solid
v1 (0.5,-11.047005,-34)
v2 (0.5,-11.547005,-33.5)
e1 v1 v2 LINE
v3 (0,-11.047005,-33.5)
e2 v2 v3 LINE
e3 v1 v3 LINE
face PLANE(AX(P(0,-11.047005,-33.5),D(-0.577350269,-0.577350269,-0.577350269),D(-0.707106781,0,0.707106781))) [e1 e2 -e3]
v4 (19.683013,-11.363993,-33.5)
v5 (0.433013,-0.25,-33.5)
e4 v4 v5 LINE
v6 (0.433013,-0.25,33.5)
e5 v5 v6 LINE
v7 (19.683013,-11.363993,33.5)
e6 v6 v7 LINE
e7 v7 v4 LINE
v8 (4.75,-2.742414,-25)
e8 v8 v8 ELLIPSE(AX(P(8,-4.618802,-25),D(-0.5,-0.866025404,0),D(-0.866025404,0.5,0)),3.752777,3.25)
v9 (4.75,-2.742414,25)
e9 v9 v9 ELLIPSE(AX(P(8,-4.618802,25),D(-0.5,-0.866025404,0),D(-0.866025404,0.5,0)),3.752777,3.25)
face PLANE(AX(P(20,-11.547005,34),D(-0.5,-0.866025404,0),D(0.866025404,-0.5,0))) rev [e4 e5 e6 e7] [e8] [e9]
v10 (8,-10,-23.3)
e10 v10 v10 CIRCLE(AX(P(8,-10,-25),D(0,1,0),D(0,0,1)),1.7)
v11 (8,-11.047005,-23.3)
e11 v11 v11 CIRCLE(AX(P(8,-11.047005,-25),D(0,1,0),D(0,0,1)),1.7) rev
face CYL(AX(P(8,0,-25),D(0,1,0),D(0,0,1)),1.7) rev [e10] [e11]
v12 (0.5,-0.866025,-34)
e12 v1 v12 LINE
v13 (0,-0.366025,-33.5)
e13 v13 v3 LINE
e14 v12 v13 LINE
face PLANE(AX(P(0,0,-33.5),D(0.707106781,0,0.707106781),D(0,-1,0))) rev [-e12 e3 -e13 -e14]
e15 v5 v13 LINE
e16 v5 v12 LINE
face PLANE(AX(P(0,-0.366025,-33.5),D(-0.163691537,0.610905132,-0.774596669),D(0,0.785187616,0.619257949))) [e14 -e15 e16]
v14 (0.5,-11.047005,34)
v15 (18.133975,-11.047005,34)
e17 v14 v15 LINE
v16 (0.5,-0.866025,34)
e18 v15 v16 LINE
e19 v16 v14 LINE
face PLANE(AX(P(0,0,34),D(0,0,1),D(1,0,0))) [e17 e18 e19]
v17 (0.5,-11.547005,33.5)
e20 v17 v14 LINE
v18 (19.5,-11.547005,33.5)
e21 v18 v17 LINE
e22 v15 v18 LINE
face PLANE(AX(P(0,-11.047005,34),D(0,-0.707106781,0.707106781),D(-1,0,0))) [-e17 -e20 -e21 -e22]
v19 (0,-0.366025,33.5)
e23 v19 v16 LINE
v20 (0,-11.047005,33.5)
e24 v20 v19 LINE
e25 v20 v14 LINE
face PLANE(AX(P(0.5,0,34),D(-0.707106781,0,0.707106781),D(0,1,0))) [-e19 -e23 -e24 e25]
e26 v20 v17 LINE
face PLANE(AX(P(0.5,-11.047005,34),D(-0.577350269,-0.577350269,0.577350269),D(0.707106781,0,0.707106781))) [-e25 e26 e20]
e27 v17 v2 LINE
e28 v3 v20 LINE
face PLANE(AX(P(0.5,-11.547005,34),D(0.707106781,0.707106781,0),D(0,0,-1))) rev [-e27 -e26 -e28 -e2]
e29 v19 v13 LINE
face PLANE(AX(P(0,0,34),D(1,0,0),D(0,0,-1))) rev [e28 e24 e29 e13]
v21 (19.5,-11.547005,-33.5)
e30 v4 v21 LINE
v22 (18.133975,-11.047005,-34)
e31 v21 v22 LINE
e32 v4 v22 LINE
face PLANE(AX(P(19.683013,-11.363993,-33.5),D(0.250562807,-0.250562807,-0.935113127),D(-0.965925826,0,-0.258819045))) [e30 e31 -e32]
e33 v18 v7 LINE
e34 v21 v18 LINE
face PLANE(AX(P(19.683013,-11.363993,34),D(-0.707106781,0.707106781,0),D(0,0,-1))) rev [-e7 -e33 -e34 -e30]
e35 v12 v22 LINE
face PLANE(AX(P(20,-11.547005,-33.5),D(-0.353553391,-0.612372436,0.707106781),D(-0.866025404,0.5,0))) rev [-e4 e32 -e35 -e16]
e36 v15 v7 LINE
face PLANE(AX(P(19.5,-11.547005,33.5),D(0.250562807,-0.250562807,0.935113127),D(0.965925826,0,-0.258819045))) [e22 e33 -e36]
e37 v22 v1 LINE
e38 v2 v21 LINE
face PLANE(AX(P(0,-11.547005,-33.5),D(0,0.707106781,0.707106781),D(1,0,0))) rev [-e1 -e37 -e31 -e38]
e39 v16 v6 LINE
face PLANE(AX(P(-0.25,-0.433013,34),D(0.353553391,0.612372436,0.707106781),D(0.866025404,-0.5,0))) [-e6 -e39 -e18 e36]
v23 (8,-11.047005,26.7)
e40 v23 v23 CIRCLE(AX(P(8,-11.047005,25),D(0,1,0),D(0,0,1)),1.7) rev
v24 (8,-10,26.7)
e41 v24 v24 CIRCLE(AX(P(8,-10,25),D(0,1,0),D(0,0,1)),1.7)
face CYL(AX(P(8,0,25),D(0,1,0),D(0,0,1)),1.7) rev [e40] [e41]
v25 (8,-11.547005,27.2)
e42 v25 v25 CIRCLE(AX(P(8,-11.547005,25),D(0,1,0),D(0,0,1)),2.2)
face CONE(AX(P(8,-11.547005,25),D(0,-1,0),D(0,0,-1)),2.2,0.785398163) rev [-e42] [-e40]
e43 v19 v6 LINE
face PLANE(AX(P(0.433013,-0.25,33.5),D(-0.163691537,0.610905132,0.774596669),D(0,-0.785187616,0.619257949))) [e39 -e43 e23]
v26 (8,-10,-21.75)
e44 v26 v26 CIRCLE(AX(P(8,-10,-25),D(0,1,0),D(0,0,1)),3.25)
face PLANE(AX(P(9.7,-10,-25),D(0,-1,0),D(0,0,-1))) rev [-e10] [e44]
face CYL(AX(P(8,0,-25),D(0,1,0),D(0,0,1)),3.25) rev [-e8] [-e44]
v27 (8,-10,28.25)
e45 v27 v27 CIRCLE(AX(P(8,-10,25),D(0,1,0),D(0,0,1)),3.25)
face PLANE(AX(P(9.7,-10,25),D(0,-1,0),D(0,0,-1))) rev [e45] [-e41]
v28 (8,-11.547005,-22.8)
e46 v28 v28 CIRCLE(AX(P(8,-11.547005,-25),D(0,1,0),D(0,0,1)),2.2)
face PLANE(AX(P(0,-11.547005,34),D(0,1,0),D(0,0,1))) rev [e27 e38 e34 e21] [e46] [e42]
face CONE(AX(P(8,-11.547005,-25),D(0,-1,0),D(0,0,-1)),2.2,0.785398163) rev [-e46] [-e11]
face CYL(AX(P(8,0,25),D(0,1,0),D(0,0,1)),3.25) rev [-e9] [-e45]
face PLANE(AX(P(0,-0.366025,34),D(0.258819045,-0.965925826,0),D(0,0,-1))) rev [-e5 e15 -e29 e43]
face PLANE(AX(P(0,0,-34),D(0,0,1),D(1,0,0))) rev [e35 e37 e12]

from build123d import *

# Parameters (mm, degrees)
BOSS_EXTRUDE1_DEPTH                                 = 34
CBORE_FOR_M3_HEX_SOCKET_HEAD_CAP_SCREW1_D           = 3.4
CBORE_FOR_M3_HEX_SOCKET_HEAD_CAP_SCREW1_CBORE_D     = 6.5
CBORE_FOR_M3_HEX_SOCKET_HEAD_CAP_SCREW1_CBORE_DEPTH = 10


with BuildPart() as part:
    # Sketch1 → Boss-Extrude1 (new, symmetric)
    with BuildSketch(Plane.XY):
        Polygon((0, 0), (0, -11.547005384), (20, -11.547005384), align=None)
    extrude(amount=BOSS_EXTRUDE1_DEPTH, both=True)

    # CBORE for M3 Hex Socket Head Cap Screw1 (through all)
    with Locations(Plane(origin=(0, 0, 0), x_dir=(1, 0, 0), z_dir=(0, 1, 0))):
        with Locations((8, -25), (8, 25)):
            CounterBoreHole(CBORE_FOR_M3_HEX_SOCKET_HEAD_CAP_SCREW1_D / 2, CBORE_FOR_M3_HEX_SOCKET_HEAD_CAP_SCREW1_CBORE_D / 2, CBORE_FOR_M3_HEX_SOCKET_HEAD_CAP_SCREW1_CBORE_DEPTH)

    # Chamfer1
    # the kernel refuses this chamfer: 0.5, 0.366025404 mm, written as the material it takes off along each edge
    with BuildSketch(Plane(origin=(0.333333333, -11.21367205, 33.666666667), x_dir=(0.7071067811865475, -0.7071067811865476, 0), z_dir=(-0.5773502691896258, -0.5773502691896257, 0.5773502691896256)), Plane(origin=(0.333333333, -11.21367205, -33.666666667), x_dir=(0.7071067811865474, 0, -0.7071067811865476), z_dir=(-0.5773502691896258, -0.5773502691896257, -0.5773502691896257))) as chamfer1_piece_1:
        Polygon((-0.353553391, -0.204124145), (0.353553391, -0.204124145), (0, 0.40824829), align=None)
    extrude(amount=0.635085296, mode=Mode.SUBTRACT)
    with BuildSketch(Plane(origin=(19.105662433, -11.319334483, 33.666666667), x_dir=(-0.8880738339771186, 0.3250575836718637, 0.3250575836718637), z_dir=(0.25056280708572953, -0.2505628070857271, 0.9351131265310311))) as chamfer1_piece_2:
        Polygon((-0.478383292, 0.07914139), (1.059805709, 0.07914139), (-0.581422417, -0.15828278), align=None)
    extrude(amount=0.652121763, mode=Mode.SUBTRACT)
    with BuildSketch(Plane(origin=(19.105662433, -11.319334483, -33.666666667), x_dir=(0.8880738339771186, -0.3250575836718637, 0.3250575836718637), z_dir=(0.25056280708572953, -0.2505628070857271, -0.9351131265310311))) as chamfer1_piece_3:
        Polygon((-1.059805709, 0.07914139), (0.478383292, 0.07914139), (0.581422417, -0.15828278), align=None)
    extrude(amount=0.652121763, mode=Mode.SUBTRACT)
    with BuildSketch(Plane(origin=(0.311004234, -0.494016936, -33.666666667), x_dir=(0.5773502691896288, -0.5773502691896194, -0.5773502691896291), z_dir=(-0.16369153687076843, 0.6109051323707225, -0.7745966692414806))) as chamfer1_piece_4:
        Polygon((-0.349679369, 0.136409614), (0.516346035, 0.136409614), (-0.166666667, -0.272819228), align=None)
    extrude(amount=0.671995646, mode=Mode.SUBTRACT)
    with BuildSketch(Plane(origin=(0.311004234, -0.494016936, 33.666666667), x_dir=(0.5773502691896286, -0.5773502691896196, 0.5773502691896291), z_dir=(-0.1636915368707684, 0.6109051323707224, 0.7745966692414807))) as chamfer1_piece_5:
        Polygon((-0.349679369, -0.136409614), (0.516346035, -0.136409614), (-0.166666667, 0.272819228), align=None)
    extrude(amount=0.671995646, mode=Mode.SUBTRACT)
    with BuildSketch(Plane(origin=(-1.285841494, -11.547005384, 34), x_dir=(0, -0.02749587661058574, -0.9996219169112968), z_dir=(1, 0, 0)), Plane(origin=(-1.285841494, -11.547005384, -34), x_dir=(0, 0.999621916911297, -0.0274958766105822), z_dir=(1, 0, 0))) as chamfer1_piece_6:
        with BuildLine():
            Line((0.514336598, 0), (-0.028273577, 0.513558897))
            Line((-0.028273577, 0.513558897), (-0.038269797, 0.513283938))
            ThreePointArc((-0.038269797, 0.513283938), (-0.017064614, 0.256698915), (-0.009996219, -0.000274959))
            Line((-0.009996219, -0.000274959), (0.000274959, -0.009996219))
            ThreePointArc((0.000274959, -0.009996219), (0.257248832, -0.002927825), (0.514611556, -0.009996219))
            Line((0.514611556, -0.009996219), (0.514336598, 0))
        make_face()
    extrude(amount=22.571682988, mode=Mode.SUBTRACT)
    with BuildSketch(Plane(origin=(8, -11.547005384, -25), x_dir=(-1, 0, 0), z_dir=(0, 0, 1))) as chamfer1_piece_7:
        with BuildLine():
            Line((2.214142136, 0.014142136), (1.685857864, -0.514142136))
            Line((1.685857864, -0.514142136), (1.675857864, -0.514142136))
            ThreePointArc((1.675857864, -0.514142136), (1.69, -0.257071068), (1.69, 0))
            Line((1.69, 0), (1.7, 0.01))
            ThreePointArc((1.7, 0.01), (1.957071068, 0.01), (2.214142136, 0.024142136))
            Line((2.214142136, 0.024142136), (2.214142136, 0.014142136))
        make_face()
    revolve(axis=Axis((8, -11.547005384, -25), (0, -1, 0)), mode=Mode.SUBTRACT)
    with BuildSketch(Plane(origin=(8, -11.547005384, 25), x_dir=(-1, 0, 0), z_dir=(0, 0, 1))) as chamfer1_piece_8:
        with BuildLine():
            Line((2.214142136, 0.014142136), (1.685857864, -0.514142136))
            Line((1.685857864, -0.514142136), (1.675857864, -0.514142136))
            ThreePointArc((1.675857864, -0.514142136), (1.69, -0.257071068), (1.69, 0))
            Line((1.69, 0), (1.7, 0.01))
            ThreePointArc((1.7, 0.01), (1.957071068, 0.01), (2.214142136, 0.024142136))
            Line((2.214142136, 0.024142136), (2.214142136, 0.014142136))
        make_face()
    revolve(axis=Axis((8, -11.547005384, 25), (0, -1, 0)), mode=Mode.SUBTRACT)
    with BuildSketch(Plane(origin=(0, 1.285841494, -34), x_dir=(-0.027495876610586483, 0, 0.9996219169112968), z_dir=(0, -1, 0))) as chamfer1_piece_9:
        with BuildLine():
            Line((0.514336598, 0), (-0.028273577, -0.513558897))
            Line((-0.028273577, -0.513558897), (-0.038269797, -0.513283938))
            ThreePointArc((-0.038269797, -0.513283938), (-0.017064614, -0.256698915), (-0.009996219, 0.000274959))
            Line((-0.009996219, 0.000274959), (0.000274959, 0.009996219))
            ThreePointArc((0.000274959, 0.009996219), (0.257248832, 0.002927825), (0.514611556, 0.009996219))
            Line((0.514611556, 0.009996219), (0.514336598, 0))
        make_face()
    extrude(amount=14.118688372, mode=Mode.SUBTRACT)
    with BuildSketch(Plane(origin=(21.113571399, -12.189926131, -34), x_dir=(-0.4998109584556428, -0.8656979742248838, -0.027495876610582233), z_dir=(-0.8660254037844419, 0.4999999999999943, 0))) as chamfer1_piece_10:
        with BuildLine():
            Line((0.514336598, 0), (-0.028273577, 0.513558897))
            Line((-0.028273577, 0.513558897), (-0.038269797, 0.513283938))
            ThreePointArc((-0.038269797, 0.513283938), (-0.017064614, 0.256698915), (-0.009996219, -0.000274959))
            Line((-0.009996219, -0.000274959), (0.000274959, -0.009996219))
            ThreePointArc((0.000274959, -0.009996219), (0.257248832, -0.002927825), (0.514611556, -0.009996219))
            Line((0.514611556, -0.009996219), (0.514336598, 0))
        make_face()
    extrude(amount=25.665693756, mode=Mode.SUBTRACT)
    with BuildSketch(Plane(origin=(21.113571399, -12.189926131, 34), x_dir=(-0.4998109584556428, -0.8656979742248838, 0.027495876610582233), z_dir=(-0.8660254037844419, 0.4999999999999943, 0))) as chamfer1_piece_11:
        with BuildLine():
            Line((0.514336598, 0), (-0.028273577, -0.513558897))
            Line((-0.028273577, -0.513558897), (-0.038269797, -0.513283938))
            ThreePointArc((-0.038269797, -0.513283938), (-0.017064614, -0.256698915), (-0.009996219, 0.000274959))
            Line((-0.009996219, 0.000274959), (0.000274959, 0.009996219))
            ThreePointArc((0.000274959, 0.009996219), (0.257248832, 0.002927825), (0.514611556, 0.009996219))
            Line((0.514611556, 0.009996219), (0.514336598, 0))
        make_face()
    extrude(amount=25.665693756, mode=Mode.SUBTRACT)
    with BuildSketch(Plane(origin=(0, -11.547005384, -35.285841494), x_dir=(-0.02749587661058639, 0.9996219169112968, 0), z_dir=(0, 0, 1))) as chamfer1_piece_12:
        with BuildLine():
            Line((0.514336598, 0), (-0.028273577, -0.513558897))
            Line((-0.028273577, -0.513558897), (-0.038269797, -0.513283938))
            ThreePointArc((-0.038269797, -0.513283938), (-0.017064614, -0.256698915), (-0.009996219, 0.000274959))
            Line((-0.009996219, 0.000274959), (0.000274959, 0.009996219))
            ThreePointArc((0.000274959, 0.009996219), (0.257248832, 0.002927825), (0.514611556, 0.009996219))
            Line((0.514611556, 0.009996219), (0.514336598, 0))
        make_face()
    extrude(amount=70.571682988, mode=Mode.SUBTRACT)
    with BuildSketch(Plane(origin=(0, 1.285841494, 34), x_dir=(-0.027495876610586483, 0, -0.9996219169112968), z_dir=(0, -1, 0))) as chamfer1_piece_13:
        with BuildLine():
            Line((0.514336598, 0), (-0.028273577, 0.513558897))
            Line((-0.028273577, 0.513558897), (-0.038269797, 0.513283938))
            ThreePointArc((-0.038269797, 0.513283938), (-0.017064614, 0.256698915), (-0.009996219, -0.000274959))
            Line((-0.009996219, -0.000274959), (0.000274959, -0.009996219))
            ThreePointArc((0.000274959, -0.009996219), (0.257248832, -0.002927825), (0.514611556, -0.009996219))
            Line((0.514611556, -0.009996219), (0.514336598, 0))
        make_face()
    extrude(amount=14.118688372, mode=Mode.SUBTRACT)
    with BuildSketch(Plane(origin=(20, -11.547005384, 35.285841494), x_dir=(-0.9996219169112968, -0.02749587661058555, 0), z_dir=(0, 0, -1))) as chamfer1_piece_14:
        with BuildLine():
            Line((0.514336598, 0), (0.297309717, 0.20540729))
            Line((0.297309717, 0.20540729), (0.292073486, 0.21392679))
            ThreePointArc((0.292073486, 0.21392679), (0.148476438, 0.10299394), (-0.005236231, 0.0085195))
            Line((-0.005236231, 0.0085195), (0.000274959, -0.009996219))
            ThreePointArc((0.000274959, -0.009996219), (0.257248832, -0.002927825), (0.514611556, -0.009996219))
            Line((0.514611556, -0.009996219), (0.514336598, 0))
        make_face()
    extrude(amount=70.571682988, mode=Mode.SUBTRACT)
    with BuildSketch(Plane(origin=(0, 0, 35.285841494), x_dir=(-0.05197283076278021, -0.9986484991539833, 0), z_dir=(0, 0, -1))) as chamfer1_piece_15:
        with BuildLine():
            Line((0.371704143, 0), (0.220983806, -0.464444069))
            Line((0.220983806, -0.464444069), (0.212075392, -0.468987213))
            ThreePointArc((0.212075392, -0.468987213), (0.107882689, -0.233552691), (-0.008908414, -0.004543145))
            Line((-0.008908414, -0.004543145), (0.000519728, 0.009986485))
            ThreePointArc((0.000519728, 0.009986485), (0.185869781, 0.000340281), (0.372223871, 0.009986485))
            Line((0.372223871, 0.009986485), (0.371704143, 0))
        make_face()
    extrude(amount=70.571682988, mode=Mode.SUBTRACT)


solid = part.part
